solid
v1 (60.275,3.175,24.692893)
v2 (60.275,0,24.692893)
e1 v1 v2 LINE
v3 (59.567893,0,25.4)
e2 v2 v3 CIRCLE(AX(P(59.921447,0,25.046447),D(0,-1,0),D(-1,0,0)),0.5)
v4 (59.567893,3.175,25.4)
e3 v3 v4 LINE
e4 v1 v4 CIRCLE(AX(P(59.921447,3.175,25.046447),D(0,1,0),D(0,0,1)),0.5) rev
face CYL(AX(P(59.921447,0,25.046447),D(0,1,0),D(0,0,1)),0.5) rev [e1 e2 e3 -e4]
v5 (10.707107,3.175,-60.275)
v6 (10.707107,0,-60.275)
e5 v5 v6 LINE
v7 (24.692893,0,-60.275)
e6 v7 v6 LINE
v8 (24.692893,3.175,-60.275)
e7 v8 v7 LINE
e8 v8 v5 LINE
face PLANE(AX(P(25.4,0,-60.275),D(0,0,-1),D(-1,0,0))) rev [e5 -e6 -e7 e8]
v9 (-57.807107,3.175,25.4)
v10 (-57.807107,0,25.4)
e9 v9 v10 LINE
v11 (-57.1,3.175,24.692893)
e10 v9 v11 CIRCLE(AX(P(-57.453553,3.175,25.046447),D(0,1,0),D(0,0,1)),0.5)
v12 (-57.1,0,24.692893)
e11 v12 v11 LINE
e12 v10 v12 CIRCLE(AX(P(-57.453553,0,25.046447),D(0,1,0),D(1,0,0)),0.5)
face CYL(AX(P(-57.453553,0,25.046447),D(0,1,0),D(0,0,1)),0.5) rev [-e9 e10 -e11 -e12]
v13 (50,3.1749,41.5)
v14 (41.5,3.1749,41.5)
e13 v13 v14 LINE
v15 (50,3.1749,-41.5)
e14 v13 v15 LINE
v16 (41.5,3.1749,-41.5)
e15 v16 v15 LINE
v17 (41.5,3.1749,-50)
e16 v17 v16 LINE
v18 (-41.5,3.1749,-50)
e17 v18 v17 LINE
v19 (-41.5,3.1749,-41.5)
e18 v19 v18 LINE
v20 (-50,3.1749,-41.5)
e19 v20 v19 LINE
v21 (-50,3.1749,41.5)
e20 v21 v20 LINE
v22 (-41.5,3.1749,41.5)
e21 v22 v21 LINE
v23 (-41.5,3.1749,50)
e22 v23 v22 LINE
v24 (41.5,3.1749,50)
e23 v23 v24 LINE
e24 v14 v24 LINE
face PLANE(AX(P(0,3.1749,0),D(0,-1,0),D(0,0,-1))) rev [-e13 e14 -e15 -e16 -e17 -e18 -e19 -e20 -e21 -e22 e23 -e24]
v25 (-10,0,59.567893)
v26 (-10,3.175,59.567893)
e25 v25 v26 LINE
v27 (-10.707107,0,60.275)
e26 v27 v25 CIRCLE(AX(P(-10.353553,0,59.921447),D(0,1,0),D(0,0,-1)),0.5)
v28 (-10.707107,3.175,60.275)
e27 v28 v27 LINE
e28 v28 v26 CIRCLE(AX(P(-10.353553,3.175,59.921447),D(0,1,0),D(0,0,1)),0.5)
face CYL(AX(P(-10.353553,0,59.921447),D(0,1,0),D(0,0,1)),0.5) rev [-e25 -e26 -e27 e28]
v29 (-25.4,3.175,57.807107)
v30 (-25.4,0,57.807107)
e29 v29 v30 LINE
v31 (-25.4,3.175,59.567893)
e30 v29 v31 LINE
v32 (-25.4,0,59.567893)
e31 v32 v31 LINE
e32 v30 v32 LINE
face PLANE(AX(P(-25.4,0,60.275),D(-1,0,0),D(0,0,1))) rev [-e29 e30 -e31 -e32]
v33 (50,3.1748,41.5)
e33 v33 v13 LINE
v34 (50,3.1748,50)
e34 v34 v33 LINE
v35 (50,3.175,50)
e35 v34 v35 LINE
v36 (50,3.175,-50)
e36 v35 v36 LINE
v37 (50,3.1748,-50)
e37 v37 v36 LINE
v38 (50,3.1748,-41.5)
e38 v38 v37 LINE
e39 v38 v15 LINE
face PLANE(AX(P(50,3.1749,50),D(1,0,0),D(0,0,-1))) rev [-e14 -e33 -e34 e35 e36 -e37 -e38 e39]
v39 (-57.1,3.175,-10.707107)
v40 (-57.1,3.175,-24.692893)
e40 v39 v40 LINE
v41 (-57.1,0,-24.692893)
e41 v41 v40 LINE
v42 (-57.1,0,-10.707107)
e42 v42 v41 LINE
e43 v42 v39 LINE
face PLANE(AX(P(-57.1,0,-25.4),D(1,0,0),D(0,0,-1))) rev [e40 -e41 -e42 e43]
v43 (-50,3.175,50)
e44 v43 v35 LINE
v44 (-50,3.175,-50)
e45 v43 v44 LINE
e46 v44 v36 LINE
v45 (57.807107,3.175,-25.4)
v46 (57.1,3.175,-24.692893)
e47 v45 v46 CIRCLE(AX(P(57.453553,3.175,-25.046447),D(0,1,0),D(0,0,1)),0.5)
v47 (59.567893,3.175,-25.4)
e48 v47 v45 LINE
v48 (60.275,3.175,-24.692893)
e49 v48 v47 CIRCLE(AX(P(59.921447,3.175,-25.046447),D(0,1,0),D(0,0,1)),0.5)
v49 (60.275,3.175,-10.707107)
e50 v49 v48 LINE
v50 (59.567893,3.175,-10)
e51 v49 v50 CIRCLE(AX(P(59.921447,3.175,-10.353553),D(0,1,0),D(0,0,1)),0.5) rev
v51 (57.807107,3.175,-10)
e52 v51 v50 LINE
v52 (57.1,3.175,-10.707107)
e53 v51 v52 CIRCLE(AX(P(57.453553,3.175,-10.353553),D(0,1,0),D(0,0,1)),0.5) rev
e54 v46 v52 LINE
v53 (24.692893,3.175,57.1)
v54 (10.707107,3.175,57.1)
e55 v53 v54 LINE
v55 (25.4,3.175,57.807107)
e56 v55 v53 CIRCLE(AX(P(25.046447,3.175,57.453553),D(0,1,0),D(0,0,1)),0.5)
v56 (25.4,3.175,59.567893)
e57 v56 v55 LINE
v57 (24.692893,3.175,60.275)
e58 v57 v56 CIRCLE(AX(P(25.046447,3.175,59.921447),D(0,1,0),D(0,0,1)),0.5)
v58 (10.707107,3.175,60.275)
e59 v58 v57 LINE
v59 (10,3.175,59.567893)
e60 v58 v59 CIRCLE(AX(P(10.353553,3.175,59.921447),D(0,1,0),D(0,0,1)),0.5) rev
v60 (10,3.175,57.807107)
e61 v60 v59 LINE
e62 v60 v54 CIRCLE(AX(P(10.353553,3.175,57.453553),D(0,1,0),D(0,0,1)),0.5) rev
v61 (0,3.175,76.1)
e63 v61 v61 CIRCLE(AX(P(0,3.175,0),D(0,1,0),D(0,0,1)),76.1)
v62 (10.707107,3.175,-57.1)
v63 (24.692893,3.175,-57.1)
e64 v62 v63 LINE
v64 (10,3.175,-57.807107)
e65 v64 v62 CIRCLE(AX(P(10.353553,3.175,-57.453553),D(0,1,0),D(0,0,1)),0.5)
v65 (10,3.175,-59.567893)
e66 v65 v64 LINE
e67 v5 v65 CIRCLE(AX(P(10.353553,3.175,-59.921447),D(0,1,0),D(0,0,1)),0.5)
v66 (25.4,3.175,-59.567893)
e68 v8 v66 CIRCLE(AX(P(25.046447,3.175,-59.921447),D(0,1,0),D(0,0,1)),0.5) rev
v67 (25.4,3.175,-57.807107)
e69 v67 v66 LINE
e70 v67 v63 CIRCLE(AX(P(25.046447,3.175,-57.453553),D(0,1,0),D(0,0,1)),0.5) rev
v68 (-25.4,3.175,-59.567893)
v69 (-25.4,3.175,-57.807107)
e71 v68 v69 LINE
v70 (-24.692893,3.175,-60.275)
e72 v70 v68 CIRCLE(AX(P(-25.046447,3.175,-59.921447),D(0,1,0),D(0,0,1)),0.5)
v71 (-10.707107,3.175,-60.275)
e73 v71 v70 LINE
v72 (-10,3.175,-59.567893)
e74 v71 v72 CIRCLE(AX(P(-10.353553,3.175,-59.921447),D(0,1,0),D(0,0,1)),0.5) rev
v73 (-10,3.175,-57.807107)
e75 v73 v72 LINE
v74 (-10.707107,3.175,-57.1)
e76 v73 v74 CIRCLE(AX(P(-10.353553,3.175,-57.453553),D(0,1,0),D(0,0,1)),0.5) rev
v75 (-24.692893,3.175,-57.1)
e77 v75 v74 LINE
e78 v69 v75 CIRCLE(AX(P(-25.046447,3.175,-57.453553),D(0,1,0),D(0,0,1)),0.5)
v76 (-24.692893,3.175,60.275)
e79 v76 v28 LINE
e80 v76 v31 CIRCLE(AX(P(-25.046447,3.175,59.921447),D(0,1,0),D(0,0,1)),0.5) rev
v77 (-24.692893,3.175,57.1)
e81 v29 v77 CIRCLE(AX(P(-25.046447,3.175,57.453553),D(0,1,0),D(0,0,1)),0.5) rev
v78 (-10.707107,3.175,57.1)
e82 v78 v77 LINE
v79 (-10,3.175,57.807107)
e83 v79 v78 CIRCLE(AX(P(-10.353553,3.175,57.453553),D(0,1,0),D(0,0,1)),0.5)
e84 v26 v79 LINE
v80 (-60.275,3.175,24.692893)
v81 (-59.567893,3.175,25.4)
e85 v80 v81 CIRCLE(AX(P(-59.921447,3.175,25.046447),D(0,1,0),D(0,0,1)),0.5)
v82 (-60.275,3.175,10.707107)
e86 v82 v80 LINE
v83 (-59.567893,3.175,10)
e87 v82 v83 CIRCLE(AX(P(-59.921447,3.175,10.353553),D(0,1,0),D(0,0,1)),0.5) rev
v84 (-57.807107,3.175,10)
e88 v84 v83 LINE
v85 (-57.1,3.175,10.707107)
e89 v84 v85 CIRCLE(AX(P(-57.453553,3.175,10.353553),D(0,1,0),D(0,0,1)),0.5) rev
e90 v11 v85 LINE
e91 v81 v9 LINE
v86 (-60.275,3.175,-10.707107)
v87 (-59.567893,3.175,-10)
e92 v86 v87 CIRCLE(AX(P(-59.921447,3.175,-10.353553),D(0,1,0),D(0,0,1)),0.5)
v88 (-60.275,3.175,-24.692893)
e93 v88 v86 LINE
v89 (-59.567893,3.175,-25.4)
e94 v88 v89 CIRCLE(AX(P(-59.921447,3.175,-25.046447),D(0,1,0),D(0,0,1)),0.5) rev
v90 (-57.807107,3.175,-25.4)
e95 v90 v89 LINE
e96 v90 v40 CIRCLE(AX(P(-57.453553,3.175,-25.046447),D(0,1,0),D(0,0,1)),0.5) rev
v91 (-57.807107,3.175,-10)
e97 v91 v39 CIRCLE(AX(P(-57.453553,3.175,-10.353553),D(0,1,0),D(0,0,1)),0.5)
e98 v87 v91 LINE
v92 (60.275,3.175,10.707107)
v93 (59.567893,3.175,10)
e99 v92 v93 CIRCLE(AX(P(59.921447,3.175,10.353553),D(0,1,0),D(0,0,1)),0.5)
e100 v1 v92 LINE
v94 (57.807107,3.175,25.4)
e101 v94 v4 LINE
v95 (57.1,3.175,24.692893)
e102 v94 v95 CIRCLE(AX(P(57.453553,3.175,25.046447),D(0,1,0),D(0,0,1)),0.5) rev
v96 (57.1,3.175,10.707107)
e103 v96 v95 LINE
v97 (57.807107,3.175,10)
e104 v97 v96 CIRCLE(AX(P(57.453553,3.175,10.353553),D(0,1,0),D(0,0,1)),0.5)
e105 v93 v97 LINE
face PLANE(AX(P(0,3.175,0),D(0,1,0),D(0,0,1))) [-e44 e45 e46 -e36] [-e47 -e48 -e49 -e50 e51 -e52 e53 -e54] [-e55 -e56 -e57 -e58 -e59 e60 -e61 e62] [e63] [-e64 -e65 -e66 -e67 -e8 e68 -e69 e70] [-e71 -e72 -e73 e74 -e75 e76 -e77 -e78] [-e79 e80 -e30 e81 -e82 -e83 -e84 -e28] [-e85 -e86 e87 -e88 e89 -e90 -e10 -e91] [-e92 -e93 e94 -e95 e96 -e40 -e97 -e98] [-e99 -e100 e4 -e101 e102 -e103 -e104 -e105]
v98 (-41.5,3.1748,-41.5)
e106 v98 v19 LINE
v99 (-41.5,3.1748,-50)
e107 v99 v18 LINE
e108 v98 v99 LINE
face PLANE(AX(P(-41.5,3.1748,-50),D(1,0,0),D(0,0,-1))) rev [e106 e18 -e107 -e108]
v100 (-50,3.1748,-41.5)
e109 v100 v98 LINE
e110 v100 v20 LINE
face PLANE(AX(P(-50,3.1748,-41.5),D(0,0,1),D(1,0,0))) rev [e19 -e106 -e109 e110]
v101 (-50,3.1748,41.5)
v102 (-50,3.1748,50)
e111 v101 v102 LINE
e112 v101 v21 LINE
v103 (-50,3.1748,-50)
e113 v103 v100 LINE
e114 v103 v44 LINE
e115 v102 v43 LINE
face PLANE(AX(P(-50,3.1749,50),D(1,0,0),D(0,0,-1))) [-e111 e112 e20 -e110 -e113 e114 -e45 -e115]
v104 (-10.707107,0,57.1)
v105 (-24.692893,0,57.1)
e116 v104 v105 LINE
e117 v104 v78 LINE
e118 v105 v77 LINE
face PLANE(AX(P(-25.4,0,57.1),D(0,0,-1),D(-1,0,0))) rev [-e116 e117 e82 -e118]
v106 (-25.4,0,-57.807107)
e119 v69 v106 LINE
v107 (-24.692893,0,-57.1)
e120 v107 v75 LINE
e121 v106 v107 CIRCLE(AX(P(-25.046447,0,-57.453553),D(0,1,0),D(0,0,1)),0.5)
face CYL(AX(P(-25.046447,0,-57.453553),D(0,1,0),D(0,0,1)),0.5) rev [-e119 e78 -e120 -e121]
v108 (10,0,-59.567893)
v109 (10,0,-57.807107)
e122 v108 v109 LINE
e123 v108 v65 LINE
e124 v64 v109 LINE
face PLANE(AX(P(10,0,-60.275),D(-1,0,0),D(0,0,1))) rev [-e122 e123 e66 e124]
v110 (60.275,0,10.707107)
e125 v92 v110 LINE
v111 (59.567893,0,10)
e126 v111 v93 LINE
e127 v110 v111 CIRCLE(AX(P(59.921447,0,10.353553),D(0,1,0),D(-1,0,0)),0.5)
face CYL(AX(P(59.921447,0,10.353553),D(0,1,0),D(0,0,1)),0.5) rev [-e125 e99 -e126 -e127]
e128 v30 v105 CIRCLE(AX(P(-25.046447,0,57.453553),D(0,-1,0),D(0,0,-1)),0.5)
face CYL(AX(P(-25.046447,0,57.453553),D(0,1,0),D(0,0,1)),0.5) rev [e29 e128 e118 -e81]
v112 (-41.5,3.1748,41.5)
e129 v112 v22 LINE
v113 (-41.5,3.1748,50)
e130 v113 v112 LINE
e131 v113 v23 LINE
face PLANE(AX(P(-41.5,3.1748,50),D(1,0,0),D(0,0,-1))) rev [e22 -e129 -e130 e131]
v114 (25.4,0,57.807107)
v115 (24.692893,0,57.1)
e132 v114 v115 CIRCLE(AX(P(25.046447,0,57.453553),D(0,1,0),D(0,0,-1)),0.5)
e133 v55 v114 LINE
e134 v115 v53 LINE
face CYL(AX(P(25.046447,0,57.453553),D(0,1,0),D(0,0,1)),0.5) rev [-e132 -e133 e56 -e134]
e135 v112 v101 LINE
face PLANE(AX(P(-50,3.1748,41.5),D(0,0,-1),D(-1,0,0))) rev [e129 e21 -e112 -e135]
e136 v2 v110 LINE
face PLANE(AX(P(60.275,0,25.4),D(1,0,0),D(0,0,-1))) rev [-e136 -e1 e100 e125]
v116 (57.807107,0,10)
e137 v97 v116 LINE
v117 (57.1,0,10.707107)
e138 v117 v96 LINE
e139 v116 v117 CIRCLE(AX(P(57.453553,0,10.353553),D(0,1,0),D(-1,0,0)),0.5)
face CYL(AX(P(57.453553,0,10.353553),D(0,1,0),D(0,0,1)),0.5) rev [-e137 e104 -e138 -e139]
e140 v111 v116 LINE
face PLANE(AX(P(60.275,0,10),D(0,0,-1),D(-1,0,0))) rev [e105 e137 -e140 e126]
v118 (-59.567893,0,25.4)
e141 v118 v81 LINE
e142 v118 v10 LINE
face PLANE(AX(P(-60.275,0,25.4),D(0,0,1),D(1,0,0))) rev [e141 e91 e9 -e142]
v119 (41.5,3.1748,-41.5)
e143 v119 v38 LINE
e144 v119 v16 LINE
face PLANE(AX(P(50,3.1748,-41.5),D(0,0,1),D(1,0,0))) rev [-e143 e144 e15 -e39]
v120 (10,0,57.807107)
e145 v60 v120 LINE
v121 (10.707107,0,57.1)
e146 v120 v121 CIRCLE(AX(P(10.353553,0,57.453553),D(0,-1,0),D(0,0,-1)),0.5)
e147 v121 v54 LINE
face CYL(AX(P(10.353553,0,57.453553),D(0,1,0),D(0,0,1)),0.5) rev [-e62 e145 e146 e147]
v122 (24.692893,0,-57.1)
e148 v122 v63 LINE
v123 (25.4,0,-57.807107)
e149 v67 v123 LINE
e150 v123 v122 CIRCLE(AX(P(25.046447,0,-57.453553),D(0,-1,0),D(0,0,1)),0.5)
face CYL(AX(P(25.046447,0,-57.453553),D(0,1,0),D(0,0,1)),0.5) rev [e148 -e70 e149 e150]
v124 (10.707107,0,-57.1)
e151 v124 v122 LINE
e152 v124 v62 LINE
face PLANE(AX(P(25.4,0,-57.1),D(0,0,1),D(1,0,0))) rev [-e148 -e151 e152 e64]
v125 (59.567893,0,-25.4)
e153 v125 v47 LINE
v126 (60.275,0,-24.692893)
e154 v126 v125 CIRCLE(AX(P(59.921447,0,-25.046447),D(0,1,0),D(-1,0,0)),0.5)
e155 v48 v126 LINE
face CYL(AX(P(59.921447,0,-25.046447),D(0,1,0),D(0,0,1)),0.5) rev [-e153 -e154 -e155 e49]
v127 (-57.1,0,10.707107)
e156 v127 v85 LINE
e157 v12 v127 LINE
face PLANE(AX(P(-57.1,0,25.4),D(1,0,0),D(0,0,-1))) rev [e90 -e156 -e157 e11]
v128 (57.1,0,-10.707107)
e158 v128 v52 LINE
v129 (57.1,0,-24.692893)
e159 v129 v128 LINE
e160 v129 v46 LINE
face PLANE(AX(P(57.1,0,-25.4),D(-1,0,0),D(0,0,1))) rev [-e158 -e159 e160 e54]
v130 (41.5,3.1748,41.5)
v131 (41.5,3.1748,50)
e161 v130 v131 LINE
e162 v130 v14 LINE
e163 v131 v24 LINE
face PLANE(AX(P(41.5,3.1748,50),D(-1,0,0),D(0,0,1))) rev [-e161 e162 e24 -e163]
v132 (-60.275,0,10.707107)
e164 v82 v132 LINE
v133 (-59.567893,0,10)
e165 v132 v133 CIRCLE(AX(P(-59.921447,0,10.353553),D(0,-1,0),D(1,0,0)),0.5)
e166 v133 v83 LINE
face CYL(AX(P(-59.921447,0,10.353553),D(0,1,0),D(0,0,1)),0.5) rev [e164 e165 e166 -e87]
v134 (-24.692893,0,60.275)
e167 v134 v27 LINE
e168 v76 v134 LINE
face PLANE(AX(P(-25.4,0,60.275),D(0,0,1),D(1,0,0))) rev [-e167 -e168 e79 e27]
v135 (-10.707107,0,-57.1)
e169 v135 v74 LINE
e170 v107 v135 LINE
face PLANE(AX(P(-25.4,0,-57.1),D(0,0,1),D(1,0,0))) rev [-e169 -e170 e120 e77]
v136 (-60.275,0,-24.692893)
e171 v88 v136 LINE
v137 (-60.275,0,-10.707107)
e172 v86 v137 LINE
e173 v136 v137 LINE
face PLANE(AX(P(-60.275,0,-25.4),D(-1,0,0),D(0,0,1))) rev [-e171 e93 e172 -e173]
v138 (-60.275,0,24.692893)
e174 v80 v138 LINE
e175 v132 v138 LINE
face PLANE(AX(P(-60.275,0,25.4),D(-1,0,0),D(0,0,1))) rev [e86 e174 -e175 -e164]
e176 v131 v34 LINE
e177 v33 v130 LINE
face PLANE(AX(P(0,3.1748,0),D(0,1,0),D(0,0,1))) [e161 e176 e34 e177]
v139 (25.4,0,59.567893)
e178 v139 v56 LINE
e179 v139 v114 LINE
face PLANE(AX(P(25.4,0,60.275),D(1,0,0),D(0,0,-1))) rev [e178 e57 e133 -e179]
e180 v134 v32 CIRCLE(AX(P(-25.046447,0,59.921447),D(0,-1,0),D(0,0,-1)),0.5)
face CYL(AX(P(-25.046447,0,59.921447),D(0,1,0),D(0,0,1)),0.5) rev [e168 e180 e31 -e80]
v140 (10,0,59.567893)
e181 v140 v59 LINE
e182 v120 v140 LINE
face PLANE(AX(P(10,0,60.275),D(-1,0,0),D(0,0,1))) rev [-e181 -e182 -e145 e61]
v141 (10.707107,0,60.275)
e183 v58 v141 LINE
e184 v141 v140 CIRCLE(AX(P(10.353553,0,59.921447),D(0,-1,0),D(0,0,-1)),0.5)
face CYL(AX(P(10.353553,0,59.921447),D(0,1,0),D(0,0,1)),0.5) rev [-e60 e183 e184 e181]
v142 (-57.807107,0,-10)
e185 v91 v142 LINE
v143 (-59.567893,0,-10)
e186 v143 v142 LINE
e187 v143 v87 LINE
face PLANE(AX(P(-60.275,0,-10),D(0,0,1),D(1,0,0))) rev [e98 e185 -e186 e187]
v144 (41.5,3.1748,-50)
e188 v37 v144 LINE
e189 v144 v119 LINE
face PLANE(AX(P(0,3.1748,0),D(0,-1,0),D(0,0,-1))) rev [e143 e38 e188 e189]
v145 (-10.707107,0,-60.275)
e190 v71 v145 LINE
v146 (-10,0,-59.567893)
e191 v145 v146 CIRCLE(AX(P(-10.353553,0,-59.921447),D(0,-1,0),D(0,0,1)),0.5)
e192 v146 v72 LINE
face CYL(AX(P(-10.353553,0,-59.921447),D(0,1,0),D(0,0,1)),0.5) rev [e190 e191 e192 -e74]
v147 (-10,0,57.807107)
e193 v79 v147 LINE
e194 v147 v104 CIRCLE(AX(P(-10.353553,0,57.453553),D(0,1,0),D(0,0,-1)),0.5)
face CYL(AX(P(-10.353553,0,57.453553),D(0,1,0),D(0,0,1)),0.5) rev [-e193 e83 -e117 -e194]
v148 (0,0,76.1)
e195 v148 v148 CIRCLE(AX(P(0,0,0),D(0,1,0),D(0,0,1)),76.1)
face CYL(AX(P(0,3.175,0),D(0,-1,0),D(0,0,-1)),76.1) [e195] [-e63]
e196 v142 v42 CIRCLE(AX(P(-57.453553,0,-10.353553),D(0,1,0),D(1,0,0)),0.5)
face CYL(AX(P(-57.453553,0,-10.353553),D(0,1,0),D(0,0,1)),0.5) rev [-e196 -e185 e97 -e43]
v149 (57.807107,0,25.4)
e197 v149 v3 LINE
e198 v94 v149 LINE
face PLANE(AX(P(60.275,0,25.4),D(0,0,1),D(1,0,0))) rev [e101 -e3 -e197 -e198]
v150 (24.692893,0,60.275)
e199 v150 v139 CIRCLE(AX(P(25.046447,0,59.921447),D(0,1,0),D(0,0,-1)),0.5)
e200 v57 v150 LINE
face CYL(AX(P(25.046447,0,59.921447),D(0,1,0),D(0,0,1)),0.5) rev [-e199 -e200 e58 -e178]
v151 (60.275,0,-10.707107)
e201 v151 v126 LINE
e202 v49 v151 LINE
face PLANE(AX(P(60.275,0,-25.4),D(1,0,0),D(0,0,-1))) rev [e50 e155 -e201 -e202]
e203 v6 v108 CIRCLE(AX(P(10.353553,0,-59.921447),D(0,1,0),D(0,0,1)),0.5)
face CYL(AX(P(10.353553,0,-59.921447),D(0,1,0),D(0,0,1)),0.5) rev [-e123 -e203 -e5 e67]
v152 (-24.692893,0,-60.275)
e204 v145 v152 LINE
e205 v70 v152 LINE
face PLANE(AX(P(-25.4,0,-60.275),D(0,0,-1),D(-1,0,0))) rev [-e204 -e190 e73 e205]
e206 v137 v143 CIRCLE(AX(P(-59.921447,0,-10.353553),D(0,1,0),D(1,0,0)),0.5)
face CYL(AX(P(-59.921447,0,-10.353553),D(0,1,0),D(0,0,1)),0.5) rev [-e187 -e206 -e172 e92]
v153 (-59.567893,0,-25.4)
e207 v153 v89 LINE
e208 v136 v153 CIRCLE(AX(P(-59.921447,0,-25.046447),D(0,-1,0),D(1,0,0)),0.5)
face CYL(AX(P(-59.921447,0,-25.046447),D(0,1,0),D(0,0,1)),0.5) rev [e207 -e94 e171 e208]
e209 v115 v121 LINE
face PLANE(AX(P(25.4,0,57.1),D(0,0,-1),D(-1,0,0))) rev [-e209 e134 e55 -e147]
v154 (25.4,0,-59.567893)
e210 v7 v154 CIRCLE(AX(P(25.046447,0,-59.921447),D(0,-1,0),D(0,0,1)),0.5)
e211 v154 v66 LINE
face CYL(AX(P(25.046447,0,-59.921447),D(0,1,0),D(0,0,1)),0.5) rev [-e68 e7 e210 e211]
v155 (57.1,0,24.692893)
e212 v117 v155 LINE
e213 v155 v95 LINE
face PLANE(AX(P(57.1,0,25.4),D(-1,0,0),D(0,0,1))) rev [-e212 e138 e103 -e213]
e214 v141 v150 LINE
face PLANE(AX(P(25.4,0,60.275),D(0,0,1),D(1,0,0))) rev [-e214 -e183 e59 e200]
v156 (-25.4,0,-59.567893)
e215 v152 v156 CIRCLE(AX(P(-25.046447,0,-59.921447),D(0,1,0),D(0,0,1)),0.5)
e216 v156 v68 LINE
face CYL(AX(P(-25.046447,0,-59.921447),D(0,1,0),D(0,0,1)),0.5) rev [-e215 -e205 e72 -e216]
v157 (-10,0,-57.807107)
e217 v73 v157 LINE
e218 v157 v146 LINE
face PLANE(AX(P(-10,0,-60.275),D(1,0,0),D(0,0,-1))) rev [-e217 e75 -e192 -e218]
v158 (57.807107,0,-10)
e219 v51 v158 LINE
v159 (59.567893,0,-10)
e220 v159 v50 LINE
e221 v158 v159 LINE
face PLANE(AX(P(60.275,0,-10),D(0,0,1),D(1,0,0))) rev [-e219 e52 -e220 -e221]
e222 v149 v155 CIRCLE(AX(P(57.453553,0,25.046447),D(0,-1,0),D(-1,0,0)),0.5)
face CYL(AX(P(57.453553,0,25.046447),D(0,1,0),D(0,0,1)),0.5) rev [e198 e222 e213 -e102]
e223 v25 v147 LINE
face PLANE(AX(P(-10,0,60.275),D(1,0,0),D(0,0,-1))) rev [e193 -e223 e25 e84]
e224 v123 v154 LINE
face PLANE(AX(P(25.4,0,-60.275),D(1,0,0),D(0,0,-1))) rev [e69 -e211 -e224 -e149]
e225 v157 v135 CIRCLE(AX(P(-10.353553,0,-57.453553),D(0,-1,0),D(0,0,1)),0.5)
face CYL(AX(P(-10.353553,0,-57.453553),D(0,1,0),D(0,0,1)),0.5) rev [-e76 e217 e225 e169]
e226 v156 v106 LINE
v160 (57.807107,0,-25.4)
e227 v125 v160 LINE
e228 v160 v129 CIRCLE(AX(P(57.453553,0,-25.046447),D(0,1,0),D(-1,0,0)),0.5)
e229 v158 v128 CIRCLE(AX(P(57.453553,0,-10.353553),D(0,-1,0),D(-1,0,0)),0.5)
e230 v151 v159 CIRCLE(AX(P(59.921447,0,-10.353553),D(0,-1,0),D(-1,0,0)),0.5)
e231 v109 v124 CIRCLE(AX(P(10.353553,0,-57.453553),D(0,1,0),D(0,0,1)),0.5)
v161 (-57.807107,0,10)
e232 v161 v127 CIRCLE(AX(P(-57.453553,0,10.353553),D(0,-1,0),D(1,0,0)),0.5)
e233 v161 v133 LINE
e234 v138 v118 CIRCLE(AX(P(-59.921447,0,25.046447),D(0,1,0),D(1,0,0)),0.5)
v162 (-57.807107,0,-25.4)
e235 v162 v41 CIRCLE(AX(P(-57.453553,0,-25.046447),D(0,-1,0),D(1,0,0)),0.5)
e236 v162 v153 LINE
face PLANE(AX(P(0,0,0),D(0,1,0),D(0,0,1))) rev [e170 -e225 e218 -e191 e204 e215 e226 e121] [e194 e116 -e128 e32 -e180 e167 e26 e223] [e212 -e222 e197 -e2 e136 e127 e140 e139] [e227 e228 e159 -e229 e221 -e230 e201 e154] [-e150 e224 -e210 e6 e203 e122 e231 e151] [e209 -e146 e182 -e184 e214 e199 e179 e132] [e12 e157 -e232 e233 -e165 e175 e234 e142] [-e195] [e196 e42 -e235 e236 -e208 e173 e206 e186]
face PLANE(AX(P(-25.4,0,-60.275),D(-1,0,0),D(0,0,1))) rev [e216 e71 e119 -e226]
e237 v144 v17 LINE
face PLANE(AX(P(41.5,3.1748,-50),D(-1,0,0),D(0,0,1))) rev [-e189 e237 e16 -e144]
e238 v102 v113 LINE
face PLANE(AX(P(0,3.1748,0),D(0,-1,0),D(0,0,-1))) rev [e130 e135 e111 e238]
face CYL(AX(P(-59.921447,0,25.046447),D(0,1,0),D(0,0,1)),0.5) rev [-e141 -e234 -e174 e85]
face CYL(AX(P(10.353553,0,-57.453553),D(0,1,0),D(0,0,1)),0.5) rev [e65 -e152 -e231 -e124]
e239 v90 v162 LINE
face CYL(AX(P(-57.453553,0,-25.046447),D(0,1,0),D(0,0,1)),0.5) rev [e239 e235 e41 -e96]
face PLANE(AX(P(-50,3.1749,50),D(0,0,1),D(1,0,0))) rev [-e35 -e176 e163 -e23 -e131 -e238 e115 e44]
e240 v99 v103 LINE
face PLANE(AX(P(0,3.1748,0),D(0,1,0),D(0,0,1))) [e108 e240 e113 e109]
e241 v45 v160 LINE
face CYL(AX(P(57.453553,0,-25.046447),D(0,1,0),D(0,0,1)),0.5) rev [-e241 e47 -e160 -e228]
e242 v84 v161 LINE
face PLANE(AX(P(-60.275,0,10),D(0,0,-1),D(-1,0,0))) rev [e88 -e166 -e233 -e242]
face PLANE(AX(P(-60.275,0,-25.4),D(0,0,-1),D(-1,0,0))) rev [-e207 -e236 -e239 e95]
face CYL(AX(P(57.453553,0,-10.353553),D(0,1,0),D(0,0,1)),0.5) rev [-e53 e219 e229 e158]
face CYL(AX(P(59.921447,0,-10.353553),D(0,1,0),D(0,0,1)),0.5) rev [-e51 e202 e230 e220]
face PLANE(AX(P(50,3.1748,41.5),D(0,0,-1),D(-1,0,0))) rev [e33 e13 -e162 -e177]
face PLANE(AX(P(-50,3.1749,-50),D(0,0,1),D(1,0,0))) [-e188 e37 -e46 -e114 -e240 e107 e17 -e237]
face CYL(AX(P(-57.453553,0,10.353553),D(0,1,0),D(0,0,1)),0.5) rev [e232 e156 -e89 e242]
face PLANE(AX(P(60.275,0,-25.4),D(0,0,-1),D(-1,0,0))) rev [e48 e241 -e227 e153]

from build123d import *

# Parameters (mm, degrees)
SKETCH1_R                   = 76.1
BOSS_EXTRUDE1_DEPTH         = 3.175
SKETCH3_W                   = 15.4
SKETCH3_H                   = 3.175
CUT_EXTRUDE1_DEPTH          = 108.66847554
SKETCH4_R                   = 0.5
CUT_EXTRUDE2_DEPTH          = 108.66847554
SKETCH_PATTERN1_DEPTH       = 3.175
CIRPATTERN1_COUNT           = 4
CIRPATTERN1_COPY_1_SKETCH_R = 0.5
CIRPATTERN1_COPY_1_DEPTH    = 108.66847554
CIRPATTERN1_COPY_2_SKETCH_R = 0.5
CIRPATTERN1_COPY_2_DEPTH    = 108.66847554
CIRPATTERN1_COPY_3_SKETCH_R = 0.5
CIRPATTERN1_COPY_3_DEPTH    = 108.66847554
CIRPATTERN1_COPY_4_DEPTH    = 3.175
CIRPATTERN1_COPY_5_DEPTH    = 3.175
CIRPATTERN1_COPY_6_DEPTH    = 3.175
SKETCH2_W                   = 100
SKETCH2_H                   = 100
CUT_EXTRUDE3_DEPTH          = 0.0001
SKETCH7_W                   = 8.5
SKETCH7_H                   = 8.5
CUT_EXTRUDE4_DEPTH          = 0.0001


# Read off the part's stored shape, not the designer's step: Sketch-Pattern1
with BuildPart() as part:
    # Sketch1 → Boss-Extrude1 (new body)
    with BuildSketch(Plane(origin=(0, 0, 0), x_dir=(1, 0, 0), z_dir=(0, 1, 0))):
        with Locations(Location((0, 0, 0), (0, 0, 270))):
            Circle(SKETCH1_R)
    extrude(amount=BOSS_EXTRUDE1_DEPTH)

    # Sketch3 → Cut-Extrude1 (cut, symmetric)
    with BuildSketch(Plane(origin=(0, 3.175, 0), x_dir=(1, 0, 0), z_dir=(0, 1, 0))):
        with Locations((-17.7, 58.6875)):
            Rectangle(SKETCH3_W, SKETCH3_H)
        with Locations((17.7, 58.6875)):
            Rectangle(SKETCH3_W, SKETCH3_H)
    cut_extrude1 = extrude(amount=CUT_EXTRUDE1_DEPTH, both=True, mode=Mode.SUBTRACT)

    # Sketch4 → Cut-Extrude2 (cut, symmetric)
    with BuildSketch(Plane(origin=(0, 3.175, 0), x_dir=(1, 0, 0), z_dir=(0, 1, 0))):
        with Locations((-25.046446609, 59.921446609)):
            Circle(SKETCH4_R)
        with Locations((-25.046446609, 57.453553391)):
            Circle(SKETCH4_R)
    cut_extrude2 = extrude(amount=CUT_EXTRUDE2_DEPTH, both=True, mode=Mode.SUBTRACT)

    # Sketch-Pattern1 outline → Sketch-Pattern1 (cut)
    with BuildSketch(Plane(origin=(0, 0, 0), x_dir=(1, 0, 0), z_dir=(0, 1, 0))):
        with BuildLine():
            Line((10, 60.275), (10.707106781, 60.275))
            ThreePointArc((10.707106781, 60.275), (10.353553391, 60.421446609), (10, 60.275))
        make_face()
        with BuildLine():
            Line((10.707106781, 57.1), (10, 57.1))
            ThreePointArc((10, 57.1), (10.353553391, 56.953553391), (10.707106781, 57.1))
        make_face()
        with BuildLine():
            Line((10, 57.1), (10, 57.807106781))
            ThreePointArc((10, 57.807106781), (9.853553391, 57.453553391), (10, 57.1))
        make_face()
        with BuildLine():
            Line((10, 59.567893219), (10, 60.275))
            ThreePointArc((10, 60.275), (9.853553391, 59.921446609), (10, 59.567893219))
        make_face()
    sketch_pattern1 = extrude(amount=SKETCH_PATTERN1_DEPTH, mode=Mode.SUBTRACT)

    # Mirror1: Cut-Extrude2, Sketch-Pattern1 across plane
    add(cut_extrude2.mirror(Plane(origin=(0, 0, 0), x_dir=(0, 0, 1), z_dir=(1, 0, 0))), mode=Mode.SUBTRACT)
    add(sketch_pattern1.mirror(Plane(origin=(0, 0, 0), x_dir=(0, 0, 1), z_dir=(1, 0, 0))), mode=Mode.SUBTRACT)

    # CirPattern1: Cut-Extrude1, Cut-Extrude2, Sketch-Pattern1 ×4 about axis
    cirpattern1_axis = Axis((0, 0, 0), (0, 1, 0))
    add([cut_extrude1.rotate(cirpattern1_axis, i * 360 / CIRPATTERN1_COUNT) for i in range(1, CIRPATTERN1_COUNT)], mode=Mode.SUBTRACT)
    add([cut_extrude2.rotate(cirpattern1_axis, i * 360 / CIRPATTERN1_COUNT) for i in range(1, CIRPATTERN1_COUNT)], mode=Mode.SUBTRACT)
    add([sketch_pattern1.rotate(cirpattern1_axis, i * 360 / CIRPATTERN1_COUNT) for i in range(1, CIRPATTERN1_COUNT)], mode=Mode.SUBTRACT)

    # CirPattern1 copy 1 sketch → CirPattern1 copy 1 (cut, symmetric)
    with BuildSketch(Plane.ZX.offset(3.175)):
        with Locations((-25.046446609, -59.921446609)):
            Circle(CIRPATTERN1_COPY_1_SKETCH_R)
        with Locations((-25.046446609, -57.453553391)):
            Circle(CIRPATTERN1_COPY_1_SKETCH_R)
    extrude(amount=CIRPATTERN1_COPY_1_DEPTH, both=True, mode=Mode.SUBTRACT)

    # CirPattern1 copy 2 sketch → CirPattern1 copy 2 (cut, symmetric)
    with BuildSketch(Plane(origin=(0, 3.175, 0), x_dir=(1, 0, 0), z_dir=(0, 1, 0))):
        with Locations((-25.046446609, -59.921446609)):
            Circle(CIRPATTERN1_COPY_2_SKETCH_R)
        with Locations((-25.046446609, -57.453553391)):
            Circle(CIRPATTERN1_COPY_2_SKETCH_R)
    extrude(amount=CIRPATTERN1_COPY_2_DEPTH, both=True, mode=Mode.SUBTRACT)

    # CirPattern1 copy 3 sketch → CirPattern1 copy 3 (cut, symmetric)
    with BuildSketch(Plane(origin=(0, 3.175, 0), x_dir=(0, 0, -1), z_dir=(0, 1, 0))):
        with Locations((-25.046446609, -59.921446609)):
            Circle(CIRPATTERN1_COPY_3_SKETCH_R)
        with Locations((-25.046446609, -57.453553391)):
            Circle(CIRPATTERN1_COPY_3_SKETCH_R)
    extrude(amount=CIRPATTERN1_COPY_3_DEPTH, both=True, mode=Mode.SUBTRACT)

    # CirPattern1 copy 4 sketch → CirPattern1 copy 4 (cut)
    with BuildSketch(Plane.ZX):
        with BuildLine():
            Line((10, -60.275), (10.707106781, -60.275))
            ThreePointArc((10.707106781, -60.275), (10.353553391, -60.421446609), (10, -60.275))
        make_face()
        with BuildLine():
            Line((10.707106781, -57.1), (10, -57.1))
            ThreePointArc((10, -57.1), (10.353553391, -56.953553391), (10.707106781, -57.1))
        make_face()
        with BuildLine():
            Line((10, -57.1), (10, -57.807106781))
            ThreePointArc((10, -57.807106781), (9.853553391, -57.453553391), (10, -57.1))
        make_face()
        with BuildLine():
            Line((10, -59.567893219), (10, -60.275))
            ThreePointArc((10, -60.275), (9.853553391, -59.921446609), (10, -59.567893219))
        make_face()
    extrude(amount=CIRPATTERN1_COPY_4_DEPTH, mode=Mode.SUBTRACT)

    # CirPattern1 copy 5 sketch → CirPattern1 copy 5 (cut)
    with BuildSketch(Plane(origin=(0, 0, 0), x_dir=(1, 0, 0), z_dir=(0, 1, 0))):
        with BuildLine():
            Line((10, -60.275), (10.707106781, -60.275))
            ThreePointArc((10.707106781, -60.275), (10.353553391, -60.421446609), (10, -60.275))
        make_face()
        with BuildLine():
            Line((10.707106781, -57.1), (10, -57.1))
            ThreePointArc((10, -57.1), (10.353553391, -56.953553391), (10.707106781, -57.1))
        make_face()
        with BuildLine():
            Line((10, -57.1), (10, -57.807106781))
            ThreePointArc((10, -57.807106781), (9.853553391, -57.453553391), (10, -57.1))
        make_face()
        with BuildLine():
            Line((10, -59.567893219), (10, -60.275))
            ThreePointArc((10, -60.275), (9.853553391, -59.921446609), (10, -59.567893219))
        make_face()
    extrude(amount=CIRPATTERN1_COPY_5_DEPTH, mode=Mode.SUBTRACT)

    # CirPattern1 copy 6 sketch → CirPattern1 copy 6 (cut)
    with BuildSketch(Plane(origin=(0, 0, 0), x_dir=(0, 0, -1), z_dir=(0, 1, 0))):
        with BuildLine():
            Line((10, -60.275), (10.707106781, -60.275))
            ThreePointArc((10.707106781, -60.275), (10.353553391, -60.421446609), (10, -60.275))
        make_face()
        with BuildLine():
            Line((10.707106781, -57.1), (10, -57.1))
            ThreePointArc((10, -57.1), (10.353553391, -56.953553391), (10.707106781, -57.1))
        make_face()
        with BuildLine():
            Line((10, -57.1), (10, -57.807106781))
            ThreePointArc((10, -57.807106781), (9.853553391, -57.453553391), (10, -57.1))
        make_face()
        with BuildLine():
            Line((10, -59.567893219), (10, -60.275))
            ThreePointArc((10, -60.275), (9.853553391, -59.921446609), (10, -59.567893219))
        make_face()
    extrude(amount=CIRPATTERN1_COPY_6_DEPTH, mode=Mode.SUBTRACT)

    # Sketch2 → Cut-Extrude3 (cut)
    with BuildSketch(Plane(origin=(0, 3.175, 0), x_dir=(1, 0, 0), z_dir=(0, 1, 0))):
        Rectangle(SKETCH2_W, SKETCH2_H)
    extrude(amount=-CUT_EXTRUDE3_DEPTH, mode=Mode.SUBTRACT)

    # Sketch7 → Cut-Extrude4 (cut)
    with BuildSketch(Plane(origin=(0, 3.1749, 0), x_dir=(1, 0, 0), z_dir=(0, 1, 0))):
        with Locations((-45.75, 45.75)):
            Rectangle(SKETCH7_W, SKETCH7_H)
        with Locations((45.75, 45.75)):
            Rectangle(SKETCH7_W, SKETCH7_H)
        with Locations((45.75, -45.75)):
            Rectangle(SKETCH7_W, SKETCH7_H)
        with Locations((-45.75, -45.75)):
            Rectangle(SKETCH7_W, SKETCH7_H)
    extrude(amount=-CUT_EXTRUDE4_DEPTH, mode=Mode.SUBTRACT)


solid = part.part
